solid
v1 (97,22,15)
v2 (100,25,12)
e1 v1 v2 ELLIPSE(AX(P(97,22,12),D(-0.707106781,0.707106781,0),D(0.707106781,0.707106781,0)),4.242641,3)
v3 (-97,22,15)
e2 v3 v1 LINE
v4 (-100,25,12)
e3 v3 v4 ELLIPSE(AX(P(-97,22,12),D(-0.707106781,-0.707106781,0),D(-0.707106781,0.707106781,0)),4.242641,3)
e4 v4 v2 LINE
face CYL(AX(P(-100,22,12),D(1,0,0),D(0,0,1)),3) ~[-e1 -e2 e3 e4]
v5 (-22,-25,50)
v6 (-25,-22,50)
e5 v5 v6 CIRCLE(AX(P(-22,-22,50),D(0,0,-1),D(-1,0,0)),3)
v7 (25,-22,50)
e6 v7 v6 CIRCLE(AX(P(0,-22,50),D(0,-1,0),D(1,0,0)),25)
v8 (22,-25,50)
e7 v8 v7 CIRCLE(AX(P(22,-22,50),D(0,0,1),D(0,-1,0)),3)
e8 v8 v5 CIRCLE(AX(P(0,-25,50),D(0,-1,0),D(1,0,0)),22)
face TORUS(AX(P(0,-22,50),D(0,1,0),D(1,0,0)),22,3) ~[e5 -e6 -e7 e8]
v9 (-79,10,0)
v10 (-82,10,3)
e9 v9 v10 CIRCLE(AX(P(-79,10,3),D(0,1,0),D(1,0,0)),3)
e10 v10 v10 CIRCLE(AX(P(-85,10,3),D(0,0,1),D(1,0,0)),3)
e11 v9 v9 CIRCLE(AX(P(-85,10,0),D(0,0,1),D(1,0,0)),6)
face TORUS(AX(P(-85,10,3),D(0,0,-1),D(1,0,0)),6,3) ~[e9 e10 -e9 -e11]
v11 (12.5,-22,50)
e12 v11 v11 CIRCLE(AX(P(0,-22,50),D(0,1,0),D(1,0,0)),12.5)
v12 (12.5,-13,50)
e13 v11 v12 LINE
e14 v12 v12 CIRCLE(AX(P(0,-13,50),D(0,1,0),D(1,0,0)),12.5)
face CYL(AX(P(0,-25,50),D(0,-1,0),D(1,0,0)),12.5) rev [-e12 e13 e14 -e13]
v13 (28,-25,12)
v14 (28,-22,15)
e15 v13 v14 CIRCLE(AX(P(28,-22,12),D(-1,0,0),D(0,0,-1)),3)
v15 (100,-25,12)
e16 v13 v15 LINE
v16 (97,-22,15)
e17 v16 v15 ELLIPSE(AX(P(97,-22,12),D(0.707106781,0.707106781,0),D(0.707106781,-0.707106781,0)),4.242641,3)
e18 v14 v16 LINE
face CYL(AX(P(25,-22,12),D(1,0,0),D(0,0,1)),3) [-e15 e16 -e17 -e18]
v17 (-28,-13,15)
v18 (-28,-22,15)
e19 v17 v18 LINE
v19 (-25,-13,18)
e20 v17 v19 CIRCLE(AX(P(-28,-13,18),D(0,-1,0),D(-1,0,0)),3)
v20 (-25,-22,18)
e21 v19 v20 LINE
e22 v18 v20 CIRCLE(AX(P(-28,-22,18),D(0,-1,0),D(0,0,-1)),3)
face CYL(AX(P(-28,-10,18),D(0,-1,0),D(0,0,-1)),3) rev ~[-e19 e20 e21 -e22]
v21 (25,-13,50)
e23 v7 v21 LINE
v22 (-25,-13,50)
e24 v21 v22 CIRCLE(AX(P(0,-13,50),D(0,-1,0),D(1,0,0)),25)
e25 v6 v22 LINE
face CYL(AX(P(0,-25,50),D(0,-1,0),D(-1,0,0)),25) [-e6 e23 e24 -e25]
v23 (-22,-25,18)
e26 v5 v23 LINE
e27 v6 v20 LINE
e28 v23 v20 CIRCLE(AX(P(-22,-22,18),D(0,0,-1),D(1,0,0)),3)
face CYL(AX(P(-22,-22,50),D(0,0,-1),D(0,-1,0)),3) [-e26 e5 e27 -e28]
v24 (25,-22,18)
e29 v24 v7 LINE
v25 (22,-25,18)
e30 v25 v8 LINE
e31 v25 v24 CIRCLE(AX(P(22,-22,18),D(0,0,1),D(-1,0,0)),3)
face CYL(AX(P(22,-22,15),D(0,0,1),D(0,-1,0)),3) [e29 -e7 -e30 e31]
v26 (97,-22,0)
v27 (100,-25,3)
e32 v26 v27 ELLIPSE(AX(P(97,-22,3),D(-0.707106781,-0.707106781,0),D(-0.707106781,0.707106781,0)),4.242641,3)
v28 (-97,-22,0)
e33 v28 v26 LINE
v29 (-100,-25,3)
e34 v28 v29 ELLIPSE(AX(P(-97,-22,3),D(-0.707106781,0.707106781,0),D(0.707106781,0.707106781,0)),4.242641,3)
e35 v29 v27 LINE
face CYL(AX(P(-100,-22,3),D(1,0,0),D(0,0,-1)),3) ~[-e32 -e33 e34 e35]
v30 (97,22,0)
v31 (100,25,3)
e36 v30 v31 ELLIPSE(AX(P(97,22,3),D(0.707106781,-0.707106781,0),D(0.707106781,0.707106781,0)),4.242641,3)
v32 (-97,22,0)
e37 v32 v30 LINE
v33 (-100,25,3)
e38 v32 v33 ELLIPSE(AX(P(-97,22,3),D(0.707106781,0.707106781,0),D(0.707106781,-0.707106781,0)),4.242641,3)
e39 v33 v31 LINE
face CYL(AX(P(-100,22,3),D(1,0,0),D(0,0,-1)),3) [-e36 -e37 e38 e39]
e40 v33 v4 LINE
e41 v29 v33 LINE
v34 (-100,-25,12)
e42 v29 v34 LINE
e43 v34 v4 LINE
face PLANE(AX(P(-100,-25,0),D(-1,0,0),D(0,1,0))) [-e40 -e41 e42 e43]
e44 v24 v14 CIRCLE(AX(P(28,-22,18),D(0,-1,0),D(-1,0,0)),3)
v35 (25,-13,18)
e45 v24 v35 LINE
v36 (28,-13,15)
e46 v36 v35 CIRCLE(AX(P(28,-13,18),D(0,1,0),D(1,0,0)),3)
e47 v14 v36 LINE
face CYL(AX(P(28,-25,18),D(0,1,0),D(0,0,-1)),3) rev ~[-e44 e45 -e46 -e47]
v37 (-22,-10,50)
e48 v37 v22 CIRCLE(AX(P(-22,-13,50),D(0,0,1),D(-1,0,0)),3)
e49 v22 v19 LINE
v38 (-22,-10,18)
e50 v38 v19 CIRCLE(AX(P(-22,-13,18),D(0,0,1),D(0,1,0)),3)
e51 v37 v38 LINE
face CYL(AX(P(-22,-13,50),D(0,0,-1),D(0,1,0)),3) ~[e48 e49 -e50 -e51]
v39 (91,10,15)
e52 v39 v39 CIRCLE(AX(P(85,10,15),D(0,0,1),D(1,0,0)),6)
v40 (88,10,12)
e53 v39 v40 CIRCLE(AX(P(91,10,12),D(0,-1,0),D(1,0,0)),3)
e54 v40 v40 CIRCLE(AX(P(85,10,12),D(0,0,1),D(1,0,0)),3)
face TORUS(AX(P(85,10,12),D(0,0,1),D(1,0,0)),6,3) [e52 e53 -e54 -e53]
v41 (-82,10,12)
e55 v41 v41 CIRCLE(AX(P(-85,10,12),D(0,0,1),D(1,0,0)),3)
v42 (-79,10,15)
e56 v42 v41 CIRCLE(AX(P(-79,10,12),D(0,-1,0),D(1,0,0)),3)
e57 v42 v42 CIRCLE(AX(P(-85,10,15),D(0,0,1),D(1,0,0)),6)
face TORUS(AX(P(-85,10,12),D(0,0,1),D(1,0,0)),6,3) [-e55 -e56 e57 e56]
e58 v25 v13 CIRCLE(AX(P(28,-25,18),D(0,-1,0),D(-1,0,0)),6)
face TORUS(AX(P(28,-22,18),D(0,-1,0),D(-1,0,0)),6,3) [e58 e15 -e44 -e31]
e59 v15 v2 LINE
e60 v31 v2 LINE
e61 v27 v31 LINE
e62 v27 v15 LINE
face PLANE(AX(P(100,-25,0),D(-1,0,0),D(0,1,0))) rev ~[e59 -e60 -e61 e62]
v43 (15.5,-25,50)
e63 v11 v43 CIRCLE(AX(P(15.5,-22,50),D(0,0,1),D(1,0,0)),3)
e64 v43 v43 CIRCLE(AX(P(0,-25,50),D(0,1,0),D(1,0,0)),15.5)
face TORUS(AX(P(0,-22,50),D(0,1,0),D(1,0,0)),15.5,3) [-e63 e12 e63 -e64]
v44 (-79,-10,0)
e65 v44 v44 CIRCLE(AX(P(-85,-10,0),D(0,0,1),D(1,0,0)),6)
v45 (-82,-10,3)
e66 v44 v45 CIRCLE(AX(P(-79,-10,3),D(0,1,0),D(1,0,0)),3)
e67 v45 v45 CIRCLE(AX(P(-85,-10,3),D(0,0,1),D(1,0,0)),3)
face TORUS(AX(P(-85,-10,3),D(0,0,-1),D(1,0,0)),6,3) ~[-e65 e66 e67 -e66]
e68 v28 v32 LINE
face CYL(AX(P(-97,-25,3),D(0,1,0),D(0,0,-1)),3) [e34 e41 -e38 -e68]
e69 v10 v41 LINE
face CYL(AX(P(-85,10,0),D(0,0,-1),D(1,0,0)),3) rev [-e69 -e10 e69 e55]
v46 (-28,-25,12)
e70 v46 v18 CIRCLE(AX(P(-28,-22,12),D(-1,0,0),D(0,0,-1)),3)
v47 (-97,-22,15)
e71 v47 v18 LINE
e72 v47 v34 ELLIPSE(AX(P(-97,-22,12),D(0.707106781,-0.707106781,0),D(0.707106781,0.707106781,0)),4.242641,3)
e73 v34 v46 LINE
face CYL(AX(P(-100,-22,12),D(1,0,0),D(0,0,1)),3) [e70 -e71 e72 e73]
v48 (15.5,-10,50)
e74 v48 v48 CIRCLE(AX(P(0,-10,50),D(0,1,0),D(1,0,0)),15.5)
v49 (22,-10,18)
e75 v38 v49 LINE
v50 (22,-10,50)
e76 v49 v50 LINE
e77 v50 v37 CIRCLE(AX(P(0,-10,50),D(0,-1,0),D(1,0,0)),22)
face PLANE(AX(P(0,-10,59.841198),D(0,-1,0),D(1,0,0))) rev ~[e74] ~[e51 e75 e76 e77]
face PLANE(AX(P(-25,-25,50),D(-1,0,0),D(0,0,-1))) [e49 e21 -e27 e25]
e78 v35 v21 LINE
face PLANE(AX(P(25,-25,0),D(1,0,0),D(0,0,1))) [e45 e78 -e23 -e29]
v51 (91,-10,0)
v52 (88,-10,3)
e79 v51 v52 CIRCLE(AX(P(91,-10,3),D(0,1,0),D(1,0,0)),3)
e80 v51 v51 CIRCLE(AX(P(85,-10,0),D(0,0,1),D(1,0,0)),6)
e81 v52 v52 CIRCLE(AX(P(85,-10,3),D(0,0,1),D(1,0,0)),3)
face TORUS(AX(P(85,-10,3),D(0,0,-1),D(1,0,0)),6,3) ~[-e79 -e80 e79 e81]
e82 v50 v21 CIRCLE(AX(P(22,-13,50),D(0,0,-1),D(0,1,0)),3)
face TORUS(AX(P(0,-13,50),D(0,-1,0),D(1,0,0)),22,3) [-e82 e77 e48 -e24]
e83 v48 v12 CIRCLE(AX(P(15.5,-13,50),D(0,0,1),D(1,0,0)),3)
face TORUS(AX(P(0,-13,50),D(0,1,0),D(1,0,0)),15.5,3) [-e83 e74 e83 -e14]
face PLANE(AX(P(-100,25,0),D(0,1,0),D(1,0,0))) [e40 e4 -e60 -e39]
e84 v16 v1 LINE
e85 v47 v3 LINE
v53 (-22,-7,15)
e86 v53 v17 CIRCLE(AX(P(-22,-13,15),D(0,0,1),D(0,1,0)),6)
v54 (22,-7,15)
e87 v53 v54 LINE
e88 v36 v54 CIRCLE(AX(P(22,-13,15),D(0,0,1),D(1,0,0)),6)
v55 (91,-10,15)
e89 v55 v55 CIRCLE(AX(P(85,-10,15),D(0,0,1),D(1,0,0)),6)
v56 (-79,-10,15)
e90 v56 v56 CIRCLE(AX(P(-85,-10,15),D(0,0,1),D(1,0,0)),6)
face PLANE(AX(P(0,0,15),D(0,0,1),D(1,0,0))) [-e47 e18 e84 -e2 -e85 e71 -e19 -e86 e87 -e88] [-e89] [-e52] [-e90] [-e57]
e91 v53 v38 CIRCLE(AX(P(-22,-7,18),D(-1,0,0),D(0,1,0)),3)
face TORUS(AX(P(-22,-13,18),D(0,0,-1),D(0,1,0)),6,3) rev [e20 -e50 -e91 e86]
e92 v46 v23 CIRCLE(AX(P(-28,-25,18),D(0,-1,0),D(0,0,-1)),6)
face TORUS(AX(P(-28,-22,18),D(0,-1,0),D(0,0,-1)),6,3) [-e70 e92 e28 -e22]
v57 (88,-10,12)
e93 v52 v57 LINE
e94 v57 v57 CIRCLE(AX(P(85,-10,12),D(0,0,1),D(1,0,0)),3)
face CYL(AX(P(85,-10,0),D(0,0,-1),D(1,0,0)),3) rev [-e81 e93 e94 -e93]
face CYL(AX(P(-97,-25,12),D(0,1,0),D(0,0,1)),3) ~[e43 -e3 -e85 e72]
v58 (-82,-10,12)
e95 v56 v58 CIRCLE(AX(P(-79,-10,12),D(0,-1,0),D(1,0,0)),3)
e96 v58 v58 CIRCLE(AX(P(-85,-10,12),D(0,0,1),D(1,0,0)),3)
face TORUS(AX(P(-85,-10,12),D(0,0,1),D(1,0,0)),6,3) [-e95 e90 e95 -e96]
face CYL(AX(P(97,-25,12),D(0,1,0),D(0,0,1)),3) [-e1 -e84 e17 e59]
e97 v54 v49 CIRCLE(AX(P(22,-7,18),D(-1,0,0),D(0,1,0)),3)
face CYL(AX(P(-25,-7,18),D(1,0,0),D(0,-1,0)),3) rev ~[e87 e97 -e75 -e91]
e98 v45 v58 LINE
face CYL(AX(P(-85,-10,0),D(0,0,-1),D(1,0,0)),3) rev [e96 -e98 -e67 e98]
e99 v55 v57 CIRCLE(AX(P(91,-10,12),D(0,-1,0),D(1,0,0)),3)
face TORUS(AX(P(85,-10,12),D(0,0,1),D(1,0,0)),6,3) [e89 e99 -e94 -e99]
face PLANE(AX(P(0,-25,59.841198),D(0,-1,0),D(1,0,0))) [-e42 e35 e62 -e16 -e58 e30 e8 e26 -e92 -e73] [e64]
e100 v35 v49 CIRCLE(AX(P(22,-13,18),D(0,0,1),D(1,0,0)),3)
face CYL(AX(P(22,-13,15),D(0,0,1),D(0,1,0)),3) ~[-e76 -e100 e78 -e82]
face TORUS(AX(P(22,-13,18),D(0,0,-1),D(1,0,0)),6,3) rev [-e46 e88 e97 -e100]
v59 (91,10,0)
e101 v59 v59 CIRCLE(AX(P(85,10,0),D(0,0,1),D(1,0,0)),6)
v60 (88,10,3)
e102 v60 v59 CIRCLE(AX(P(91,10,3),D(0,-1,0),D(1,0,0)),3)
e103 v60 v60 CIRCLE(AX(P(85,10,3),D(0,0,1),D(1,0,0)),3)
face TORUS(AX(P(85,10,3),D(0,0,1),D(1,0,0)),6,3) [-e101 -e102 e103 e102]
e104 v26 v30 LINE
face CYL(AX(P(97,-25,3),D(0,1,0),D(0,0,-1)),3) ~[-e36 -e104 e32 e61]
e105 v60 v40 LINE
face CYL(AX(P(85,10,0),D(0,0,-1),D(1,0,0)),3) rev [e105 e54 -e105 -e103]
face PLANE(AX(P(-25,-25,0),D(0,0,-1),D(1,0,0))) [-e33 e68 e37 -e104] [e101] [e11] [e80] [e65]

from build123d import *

# Parameters (mm, degrees)
F0_W     = 200
F0_H     = 50
F0_R     = 3
F1_DEPTH = 15
F2_W     = 50
F2_H     = 15
F3_DEPTH = 15
F4_R     = 3


with BuildPart() as f1:
    # F0 (on Top) → F1 (new body)
    with BuildSketch(Plane.XY):
        Rectangle(F0_W, F0_H)
        with Locations((-85, -10)):
            Circle(F0_R, mode=Mode.SUBTRACT)
        with Locations((85, -10)):
            Circle(F0_R, mode=Mode.SUBTRACT)
        with Locations((-85, 10)):
            Circle(F0_R, mode=Mode.SUBTRACT)
        with Locations((85, 10)):
            Circle(F0_R, mode=Mode.SUBTRACT)
    extrude(amount=F1_DEPTH)

    # F2 (on face) → F3 (join)
    with BuildSketch(Plane.XZ.offset(25)):
        with BuildLine():
            Line((12.5, 50), (25, 50))
            ThreePointArc((25, 50), (0, 75), (-25, 50))
            Line((-25, 50), (-12.5, 50))
            ThreePointArc((-12.5, 50), (0, 62.5), (12.5, 50))
        make_face()
        with BuildLine():
            ThreePointArc((-25, 50), (0, 25), (25, 50))
            Line((25, 50), (12.5, 50))
            ThreePointArc((12.5, 50), (0, 37.5), (-12.5, 50))
            Line((-12.5, 50), (-25, 50))
        make_face()
        with BuildLine():
            Line((25, 15), (25, 50))
            ThreePointArc((25, 50), (0, 25), (-25, 50))
            Line((-25, 50), (-25, 15))
            Line((-25, 15), (25, 15))
        make_face()
        with Locations((0, 7.5)):
            Rectangle(F2_W, F2_H)
    extrude(amount=-F3_DEPTH)

    # F4
    f4_edges = [f1.edges().sort_by_distance(p)[0] for p in [
        (62.5, -25, 15),
        (25, -17.5, 15),
        (0, -10, 15),
        (-25, -17.5, 15),
        (-62.5, -25, 15),
        (-100, 0, 15),
        (0, 25, 15),
        (100, 0, 15),
        (-88, -10, 15),
        (82, -10, 15),
        (-88, 10, 15),
        (82, 10, 15),
        (25, -10, 32.5),
        (-25, -10, 32.5),
        (0, -10, 75),
        (-12.5, -10, 50),
        (-12.5, -25, 50),
        (100, 0, 0),
        (0, 25, 0),
        (-100, 0, 0),
        (0, -25, 0),
        (-88, -10, 0),
        (82, -10, 0),
        (-88, 10, 0),
        (82, 10, 0),
        (-25, -25, 32.5),
        (0, -25, 75),
        (25, -25, 32.5),
    ]]
    fillet(f4_edges, radius=F4_R)


solid = f1.part
